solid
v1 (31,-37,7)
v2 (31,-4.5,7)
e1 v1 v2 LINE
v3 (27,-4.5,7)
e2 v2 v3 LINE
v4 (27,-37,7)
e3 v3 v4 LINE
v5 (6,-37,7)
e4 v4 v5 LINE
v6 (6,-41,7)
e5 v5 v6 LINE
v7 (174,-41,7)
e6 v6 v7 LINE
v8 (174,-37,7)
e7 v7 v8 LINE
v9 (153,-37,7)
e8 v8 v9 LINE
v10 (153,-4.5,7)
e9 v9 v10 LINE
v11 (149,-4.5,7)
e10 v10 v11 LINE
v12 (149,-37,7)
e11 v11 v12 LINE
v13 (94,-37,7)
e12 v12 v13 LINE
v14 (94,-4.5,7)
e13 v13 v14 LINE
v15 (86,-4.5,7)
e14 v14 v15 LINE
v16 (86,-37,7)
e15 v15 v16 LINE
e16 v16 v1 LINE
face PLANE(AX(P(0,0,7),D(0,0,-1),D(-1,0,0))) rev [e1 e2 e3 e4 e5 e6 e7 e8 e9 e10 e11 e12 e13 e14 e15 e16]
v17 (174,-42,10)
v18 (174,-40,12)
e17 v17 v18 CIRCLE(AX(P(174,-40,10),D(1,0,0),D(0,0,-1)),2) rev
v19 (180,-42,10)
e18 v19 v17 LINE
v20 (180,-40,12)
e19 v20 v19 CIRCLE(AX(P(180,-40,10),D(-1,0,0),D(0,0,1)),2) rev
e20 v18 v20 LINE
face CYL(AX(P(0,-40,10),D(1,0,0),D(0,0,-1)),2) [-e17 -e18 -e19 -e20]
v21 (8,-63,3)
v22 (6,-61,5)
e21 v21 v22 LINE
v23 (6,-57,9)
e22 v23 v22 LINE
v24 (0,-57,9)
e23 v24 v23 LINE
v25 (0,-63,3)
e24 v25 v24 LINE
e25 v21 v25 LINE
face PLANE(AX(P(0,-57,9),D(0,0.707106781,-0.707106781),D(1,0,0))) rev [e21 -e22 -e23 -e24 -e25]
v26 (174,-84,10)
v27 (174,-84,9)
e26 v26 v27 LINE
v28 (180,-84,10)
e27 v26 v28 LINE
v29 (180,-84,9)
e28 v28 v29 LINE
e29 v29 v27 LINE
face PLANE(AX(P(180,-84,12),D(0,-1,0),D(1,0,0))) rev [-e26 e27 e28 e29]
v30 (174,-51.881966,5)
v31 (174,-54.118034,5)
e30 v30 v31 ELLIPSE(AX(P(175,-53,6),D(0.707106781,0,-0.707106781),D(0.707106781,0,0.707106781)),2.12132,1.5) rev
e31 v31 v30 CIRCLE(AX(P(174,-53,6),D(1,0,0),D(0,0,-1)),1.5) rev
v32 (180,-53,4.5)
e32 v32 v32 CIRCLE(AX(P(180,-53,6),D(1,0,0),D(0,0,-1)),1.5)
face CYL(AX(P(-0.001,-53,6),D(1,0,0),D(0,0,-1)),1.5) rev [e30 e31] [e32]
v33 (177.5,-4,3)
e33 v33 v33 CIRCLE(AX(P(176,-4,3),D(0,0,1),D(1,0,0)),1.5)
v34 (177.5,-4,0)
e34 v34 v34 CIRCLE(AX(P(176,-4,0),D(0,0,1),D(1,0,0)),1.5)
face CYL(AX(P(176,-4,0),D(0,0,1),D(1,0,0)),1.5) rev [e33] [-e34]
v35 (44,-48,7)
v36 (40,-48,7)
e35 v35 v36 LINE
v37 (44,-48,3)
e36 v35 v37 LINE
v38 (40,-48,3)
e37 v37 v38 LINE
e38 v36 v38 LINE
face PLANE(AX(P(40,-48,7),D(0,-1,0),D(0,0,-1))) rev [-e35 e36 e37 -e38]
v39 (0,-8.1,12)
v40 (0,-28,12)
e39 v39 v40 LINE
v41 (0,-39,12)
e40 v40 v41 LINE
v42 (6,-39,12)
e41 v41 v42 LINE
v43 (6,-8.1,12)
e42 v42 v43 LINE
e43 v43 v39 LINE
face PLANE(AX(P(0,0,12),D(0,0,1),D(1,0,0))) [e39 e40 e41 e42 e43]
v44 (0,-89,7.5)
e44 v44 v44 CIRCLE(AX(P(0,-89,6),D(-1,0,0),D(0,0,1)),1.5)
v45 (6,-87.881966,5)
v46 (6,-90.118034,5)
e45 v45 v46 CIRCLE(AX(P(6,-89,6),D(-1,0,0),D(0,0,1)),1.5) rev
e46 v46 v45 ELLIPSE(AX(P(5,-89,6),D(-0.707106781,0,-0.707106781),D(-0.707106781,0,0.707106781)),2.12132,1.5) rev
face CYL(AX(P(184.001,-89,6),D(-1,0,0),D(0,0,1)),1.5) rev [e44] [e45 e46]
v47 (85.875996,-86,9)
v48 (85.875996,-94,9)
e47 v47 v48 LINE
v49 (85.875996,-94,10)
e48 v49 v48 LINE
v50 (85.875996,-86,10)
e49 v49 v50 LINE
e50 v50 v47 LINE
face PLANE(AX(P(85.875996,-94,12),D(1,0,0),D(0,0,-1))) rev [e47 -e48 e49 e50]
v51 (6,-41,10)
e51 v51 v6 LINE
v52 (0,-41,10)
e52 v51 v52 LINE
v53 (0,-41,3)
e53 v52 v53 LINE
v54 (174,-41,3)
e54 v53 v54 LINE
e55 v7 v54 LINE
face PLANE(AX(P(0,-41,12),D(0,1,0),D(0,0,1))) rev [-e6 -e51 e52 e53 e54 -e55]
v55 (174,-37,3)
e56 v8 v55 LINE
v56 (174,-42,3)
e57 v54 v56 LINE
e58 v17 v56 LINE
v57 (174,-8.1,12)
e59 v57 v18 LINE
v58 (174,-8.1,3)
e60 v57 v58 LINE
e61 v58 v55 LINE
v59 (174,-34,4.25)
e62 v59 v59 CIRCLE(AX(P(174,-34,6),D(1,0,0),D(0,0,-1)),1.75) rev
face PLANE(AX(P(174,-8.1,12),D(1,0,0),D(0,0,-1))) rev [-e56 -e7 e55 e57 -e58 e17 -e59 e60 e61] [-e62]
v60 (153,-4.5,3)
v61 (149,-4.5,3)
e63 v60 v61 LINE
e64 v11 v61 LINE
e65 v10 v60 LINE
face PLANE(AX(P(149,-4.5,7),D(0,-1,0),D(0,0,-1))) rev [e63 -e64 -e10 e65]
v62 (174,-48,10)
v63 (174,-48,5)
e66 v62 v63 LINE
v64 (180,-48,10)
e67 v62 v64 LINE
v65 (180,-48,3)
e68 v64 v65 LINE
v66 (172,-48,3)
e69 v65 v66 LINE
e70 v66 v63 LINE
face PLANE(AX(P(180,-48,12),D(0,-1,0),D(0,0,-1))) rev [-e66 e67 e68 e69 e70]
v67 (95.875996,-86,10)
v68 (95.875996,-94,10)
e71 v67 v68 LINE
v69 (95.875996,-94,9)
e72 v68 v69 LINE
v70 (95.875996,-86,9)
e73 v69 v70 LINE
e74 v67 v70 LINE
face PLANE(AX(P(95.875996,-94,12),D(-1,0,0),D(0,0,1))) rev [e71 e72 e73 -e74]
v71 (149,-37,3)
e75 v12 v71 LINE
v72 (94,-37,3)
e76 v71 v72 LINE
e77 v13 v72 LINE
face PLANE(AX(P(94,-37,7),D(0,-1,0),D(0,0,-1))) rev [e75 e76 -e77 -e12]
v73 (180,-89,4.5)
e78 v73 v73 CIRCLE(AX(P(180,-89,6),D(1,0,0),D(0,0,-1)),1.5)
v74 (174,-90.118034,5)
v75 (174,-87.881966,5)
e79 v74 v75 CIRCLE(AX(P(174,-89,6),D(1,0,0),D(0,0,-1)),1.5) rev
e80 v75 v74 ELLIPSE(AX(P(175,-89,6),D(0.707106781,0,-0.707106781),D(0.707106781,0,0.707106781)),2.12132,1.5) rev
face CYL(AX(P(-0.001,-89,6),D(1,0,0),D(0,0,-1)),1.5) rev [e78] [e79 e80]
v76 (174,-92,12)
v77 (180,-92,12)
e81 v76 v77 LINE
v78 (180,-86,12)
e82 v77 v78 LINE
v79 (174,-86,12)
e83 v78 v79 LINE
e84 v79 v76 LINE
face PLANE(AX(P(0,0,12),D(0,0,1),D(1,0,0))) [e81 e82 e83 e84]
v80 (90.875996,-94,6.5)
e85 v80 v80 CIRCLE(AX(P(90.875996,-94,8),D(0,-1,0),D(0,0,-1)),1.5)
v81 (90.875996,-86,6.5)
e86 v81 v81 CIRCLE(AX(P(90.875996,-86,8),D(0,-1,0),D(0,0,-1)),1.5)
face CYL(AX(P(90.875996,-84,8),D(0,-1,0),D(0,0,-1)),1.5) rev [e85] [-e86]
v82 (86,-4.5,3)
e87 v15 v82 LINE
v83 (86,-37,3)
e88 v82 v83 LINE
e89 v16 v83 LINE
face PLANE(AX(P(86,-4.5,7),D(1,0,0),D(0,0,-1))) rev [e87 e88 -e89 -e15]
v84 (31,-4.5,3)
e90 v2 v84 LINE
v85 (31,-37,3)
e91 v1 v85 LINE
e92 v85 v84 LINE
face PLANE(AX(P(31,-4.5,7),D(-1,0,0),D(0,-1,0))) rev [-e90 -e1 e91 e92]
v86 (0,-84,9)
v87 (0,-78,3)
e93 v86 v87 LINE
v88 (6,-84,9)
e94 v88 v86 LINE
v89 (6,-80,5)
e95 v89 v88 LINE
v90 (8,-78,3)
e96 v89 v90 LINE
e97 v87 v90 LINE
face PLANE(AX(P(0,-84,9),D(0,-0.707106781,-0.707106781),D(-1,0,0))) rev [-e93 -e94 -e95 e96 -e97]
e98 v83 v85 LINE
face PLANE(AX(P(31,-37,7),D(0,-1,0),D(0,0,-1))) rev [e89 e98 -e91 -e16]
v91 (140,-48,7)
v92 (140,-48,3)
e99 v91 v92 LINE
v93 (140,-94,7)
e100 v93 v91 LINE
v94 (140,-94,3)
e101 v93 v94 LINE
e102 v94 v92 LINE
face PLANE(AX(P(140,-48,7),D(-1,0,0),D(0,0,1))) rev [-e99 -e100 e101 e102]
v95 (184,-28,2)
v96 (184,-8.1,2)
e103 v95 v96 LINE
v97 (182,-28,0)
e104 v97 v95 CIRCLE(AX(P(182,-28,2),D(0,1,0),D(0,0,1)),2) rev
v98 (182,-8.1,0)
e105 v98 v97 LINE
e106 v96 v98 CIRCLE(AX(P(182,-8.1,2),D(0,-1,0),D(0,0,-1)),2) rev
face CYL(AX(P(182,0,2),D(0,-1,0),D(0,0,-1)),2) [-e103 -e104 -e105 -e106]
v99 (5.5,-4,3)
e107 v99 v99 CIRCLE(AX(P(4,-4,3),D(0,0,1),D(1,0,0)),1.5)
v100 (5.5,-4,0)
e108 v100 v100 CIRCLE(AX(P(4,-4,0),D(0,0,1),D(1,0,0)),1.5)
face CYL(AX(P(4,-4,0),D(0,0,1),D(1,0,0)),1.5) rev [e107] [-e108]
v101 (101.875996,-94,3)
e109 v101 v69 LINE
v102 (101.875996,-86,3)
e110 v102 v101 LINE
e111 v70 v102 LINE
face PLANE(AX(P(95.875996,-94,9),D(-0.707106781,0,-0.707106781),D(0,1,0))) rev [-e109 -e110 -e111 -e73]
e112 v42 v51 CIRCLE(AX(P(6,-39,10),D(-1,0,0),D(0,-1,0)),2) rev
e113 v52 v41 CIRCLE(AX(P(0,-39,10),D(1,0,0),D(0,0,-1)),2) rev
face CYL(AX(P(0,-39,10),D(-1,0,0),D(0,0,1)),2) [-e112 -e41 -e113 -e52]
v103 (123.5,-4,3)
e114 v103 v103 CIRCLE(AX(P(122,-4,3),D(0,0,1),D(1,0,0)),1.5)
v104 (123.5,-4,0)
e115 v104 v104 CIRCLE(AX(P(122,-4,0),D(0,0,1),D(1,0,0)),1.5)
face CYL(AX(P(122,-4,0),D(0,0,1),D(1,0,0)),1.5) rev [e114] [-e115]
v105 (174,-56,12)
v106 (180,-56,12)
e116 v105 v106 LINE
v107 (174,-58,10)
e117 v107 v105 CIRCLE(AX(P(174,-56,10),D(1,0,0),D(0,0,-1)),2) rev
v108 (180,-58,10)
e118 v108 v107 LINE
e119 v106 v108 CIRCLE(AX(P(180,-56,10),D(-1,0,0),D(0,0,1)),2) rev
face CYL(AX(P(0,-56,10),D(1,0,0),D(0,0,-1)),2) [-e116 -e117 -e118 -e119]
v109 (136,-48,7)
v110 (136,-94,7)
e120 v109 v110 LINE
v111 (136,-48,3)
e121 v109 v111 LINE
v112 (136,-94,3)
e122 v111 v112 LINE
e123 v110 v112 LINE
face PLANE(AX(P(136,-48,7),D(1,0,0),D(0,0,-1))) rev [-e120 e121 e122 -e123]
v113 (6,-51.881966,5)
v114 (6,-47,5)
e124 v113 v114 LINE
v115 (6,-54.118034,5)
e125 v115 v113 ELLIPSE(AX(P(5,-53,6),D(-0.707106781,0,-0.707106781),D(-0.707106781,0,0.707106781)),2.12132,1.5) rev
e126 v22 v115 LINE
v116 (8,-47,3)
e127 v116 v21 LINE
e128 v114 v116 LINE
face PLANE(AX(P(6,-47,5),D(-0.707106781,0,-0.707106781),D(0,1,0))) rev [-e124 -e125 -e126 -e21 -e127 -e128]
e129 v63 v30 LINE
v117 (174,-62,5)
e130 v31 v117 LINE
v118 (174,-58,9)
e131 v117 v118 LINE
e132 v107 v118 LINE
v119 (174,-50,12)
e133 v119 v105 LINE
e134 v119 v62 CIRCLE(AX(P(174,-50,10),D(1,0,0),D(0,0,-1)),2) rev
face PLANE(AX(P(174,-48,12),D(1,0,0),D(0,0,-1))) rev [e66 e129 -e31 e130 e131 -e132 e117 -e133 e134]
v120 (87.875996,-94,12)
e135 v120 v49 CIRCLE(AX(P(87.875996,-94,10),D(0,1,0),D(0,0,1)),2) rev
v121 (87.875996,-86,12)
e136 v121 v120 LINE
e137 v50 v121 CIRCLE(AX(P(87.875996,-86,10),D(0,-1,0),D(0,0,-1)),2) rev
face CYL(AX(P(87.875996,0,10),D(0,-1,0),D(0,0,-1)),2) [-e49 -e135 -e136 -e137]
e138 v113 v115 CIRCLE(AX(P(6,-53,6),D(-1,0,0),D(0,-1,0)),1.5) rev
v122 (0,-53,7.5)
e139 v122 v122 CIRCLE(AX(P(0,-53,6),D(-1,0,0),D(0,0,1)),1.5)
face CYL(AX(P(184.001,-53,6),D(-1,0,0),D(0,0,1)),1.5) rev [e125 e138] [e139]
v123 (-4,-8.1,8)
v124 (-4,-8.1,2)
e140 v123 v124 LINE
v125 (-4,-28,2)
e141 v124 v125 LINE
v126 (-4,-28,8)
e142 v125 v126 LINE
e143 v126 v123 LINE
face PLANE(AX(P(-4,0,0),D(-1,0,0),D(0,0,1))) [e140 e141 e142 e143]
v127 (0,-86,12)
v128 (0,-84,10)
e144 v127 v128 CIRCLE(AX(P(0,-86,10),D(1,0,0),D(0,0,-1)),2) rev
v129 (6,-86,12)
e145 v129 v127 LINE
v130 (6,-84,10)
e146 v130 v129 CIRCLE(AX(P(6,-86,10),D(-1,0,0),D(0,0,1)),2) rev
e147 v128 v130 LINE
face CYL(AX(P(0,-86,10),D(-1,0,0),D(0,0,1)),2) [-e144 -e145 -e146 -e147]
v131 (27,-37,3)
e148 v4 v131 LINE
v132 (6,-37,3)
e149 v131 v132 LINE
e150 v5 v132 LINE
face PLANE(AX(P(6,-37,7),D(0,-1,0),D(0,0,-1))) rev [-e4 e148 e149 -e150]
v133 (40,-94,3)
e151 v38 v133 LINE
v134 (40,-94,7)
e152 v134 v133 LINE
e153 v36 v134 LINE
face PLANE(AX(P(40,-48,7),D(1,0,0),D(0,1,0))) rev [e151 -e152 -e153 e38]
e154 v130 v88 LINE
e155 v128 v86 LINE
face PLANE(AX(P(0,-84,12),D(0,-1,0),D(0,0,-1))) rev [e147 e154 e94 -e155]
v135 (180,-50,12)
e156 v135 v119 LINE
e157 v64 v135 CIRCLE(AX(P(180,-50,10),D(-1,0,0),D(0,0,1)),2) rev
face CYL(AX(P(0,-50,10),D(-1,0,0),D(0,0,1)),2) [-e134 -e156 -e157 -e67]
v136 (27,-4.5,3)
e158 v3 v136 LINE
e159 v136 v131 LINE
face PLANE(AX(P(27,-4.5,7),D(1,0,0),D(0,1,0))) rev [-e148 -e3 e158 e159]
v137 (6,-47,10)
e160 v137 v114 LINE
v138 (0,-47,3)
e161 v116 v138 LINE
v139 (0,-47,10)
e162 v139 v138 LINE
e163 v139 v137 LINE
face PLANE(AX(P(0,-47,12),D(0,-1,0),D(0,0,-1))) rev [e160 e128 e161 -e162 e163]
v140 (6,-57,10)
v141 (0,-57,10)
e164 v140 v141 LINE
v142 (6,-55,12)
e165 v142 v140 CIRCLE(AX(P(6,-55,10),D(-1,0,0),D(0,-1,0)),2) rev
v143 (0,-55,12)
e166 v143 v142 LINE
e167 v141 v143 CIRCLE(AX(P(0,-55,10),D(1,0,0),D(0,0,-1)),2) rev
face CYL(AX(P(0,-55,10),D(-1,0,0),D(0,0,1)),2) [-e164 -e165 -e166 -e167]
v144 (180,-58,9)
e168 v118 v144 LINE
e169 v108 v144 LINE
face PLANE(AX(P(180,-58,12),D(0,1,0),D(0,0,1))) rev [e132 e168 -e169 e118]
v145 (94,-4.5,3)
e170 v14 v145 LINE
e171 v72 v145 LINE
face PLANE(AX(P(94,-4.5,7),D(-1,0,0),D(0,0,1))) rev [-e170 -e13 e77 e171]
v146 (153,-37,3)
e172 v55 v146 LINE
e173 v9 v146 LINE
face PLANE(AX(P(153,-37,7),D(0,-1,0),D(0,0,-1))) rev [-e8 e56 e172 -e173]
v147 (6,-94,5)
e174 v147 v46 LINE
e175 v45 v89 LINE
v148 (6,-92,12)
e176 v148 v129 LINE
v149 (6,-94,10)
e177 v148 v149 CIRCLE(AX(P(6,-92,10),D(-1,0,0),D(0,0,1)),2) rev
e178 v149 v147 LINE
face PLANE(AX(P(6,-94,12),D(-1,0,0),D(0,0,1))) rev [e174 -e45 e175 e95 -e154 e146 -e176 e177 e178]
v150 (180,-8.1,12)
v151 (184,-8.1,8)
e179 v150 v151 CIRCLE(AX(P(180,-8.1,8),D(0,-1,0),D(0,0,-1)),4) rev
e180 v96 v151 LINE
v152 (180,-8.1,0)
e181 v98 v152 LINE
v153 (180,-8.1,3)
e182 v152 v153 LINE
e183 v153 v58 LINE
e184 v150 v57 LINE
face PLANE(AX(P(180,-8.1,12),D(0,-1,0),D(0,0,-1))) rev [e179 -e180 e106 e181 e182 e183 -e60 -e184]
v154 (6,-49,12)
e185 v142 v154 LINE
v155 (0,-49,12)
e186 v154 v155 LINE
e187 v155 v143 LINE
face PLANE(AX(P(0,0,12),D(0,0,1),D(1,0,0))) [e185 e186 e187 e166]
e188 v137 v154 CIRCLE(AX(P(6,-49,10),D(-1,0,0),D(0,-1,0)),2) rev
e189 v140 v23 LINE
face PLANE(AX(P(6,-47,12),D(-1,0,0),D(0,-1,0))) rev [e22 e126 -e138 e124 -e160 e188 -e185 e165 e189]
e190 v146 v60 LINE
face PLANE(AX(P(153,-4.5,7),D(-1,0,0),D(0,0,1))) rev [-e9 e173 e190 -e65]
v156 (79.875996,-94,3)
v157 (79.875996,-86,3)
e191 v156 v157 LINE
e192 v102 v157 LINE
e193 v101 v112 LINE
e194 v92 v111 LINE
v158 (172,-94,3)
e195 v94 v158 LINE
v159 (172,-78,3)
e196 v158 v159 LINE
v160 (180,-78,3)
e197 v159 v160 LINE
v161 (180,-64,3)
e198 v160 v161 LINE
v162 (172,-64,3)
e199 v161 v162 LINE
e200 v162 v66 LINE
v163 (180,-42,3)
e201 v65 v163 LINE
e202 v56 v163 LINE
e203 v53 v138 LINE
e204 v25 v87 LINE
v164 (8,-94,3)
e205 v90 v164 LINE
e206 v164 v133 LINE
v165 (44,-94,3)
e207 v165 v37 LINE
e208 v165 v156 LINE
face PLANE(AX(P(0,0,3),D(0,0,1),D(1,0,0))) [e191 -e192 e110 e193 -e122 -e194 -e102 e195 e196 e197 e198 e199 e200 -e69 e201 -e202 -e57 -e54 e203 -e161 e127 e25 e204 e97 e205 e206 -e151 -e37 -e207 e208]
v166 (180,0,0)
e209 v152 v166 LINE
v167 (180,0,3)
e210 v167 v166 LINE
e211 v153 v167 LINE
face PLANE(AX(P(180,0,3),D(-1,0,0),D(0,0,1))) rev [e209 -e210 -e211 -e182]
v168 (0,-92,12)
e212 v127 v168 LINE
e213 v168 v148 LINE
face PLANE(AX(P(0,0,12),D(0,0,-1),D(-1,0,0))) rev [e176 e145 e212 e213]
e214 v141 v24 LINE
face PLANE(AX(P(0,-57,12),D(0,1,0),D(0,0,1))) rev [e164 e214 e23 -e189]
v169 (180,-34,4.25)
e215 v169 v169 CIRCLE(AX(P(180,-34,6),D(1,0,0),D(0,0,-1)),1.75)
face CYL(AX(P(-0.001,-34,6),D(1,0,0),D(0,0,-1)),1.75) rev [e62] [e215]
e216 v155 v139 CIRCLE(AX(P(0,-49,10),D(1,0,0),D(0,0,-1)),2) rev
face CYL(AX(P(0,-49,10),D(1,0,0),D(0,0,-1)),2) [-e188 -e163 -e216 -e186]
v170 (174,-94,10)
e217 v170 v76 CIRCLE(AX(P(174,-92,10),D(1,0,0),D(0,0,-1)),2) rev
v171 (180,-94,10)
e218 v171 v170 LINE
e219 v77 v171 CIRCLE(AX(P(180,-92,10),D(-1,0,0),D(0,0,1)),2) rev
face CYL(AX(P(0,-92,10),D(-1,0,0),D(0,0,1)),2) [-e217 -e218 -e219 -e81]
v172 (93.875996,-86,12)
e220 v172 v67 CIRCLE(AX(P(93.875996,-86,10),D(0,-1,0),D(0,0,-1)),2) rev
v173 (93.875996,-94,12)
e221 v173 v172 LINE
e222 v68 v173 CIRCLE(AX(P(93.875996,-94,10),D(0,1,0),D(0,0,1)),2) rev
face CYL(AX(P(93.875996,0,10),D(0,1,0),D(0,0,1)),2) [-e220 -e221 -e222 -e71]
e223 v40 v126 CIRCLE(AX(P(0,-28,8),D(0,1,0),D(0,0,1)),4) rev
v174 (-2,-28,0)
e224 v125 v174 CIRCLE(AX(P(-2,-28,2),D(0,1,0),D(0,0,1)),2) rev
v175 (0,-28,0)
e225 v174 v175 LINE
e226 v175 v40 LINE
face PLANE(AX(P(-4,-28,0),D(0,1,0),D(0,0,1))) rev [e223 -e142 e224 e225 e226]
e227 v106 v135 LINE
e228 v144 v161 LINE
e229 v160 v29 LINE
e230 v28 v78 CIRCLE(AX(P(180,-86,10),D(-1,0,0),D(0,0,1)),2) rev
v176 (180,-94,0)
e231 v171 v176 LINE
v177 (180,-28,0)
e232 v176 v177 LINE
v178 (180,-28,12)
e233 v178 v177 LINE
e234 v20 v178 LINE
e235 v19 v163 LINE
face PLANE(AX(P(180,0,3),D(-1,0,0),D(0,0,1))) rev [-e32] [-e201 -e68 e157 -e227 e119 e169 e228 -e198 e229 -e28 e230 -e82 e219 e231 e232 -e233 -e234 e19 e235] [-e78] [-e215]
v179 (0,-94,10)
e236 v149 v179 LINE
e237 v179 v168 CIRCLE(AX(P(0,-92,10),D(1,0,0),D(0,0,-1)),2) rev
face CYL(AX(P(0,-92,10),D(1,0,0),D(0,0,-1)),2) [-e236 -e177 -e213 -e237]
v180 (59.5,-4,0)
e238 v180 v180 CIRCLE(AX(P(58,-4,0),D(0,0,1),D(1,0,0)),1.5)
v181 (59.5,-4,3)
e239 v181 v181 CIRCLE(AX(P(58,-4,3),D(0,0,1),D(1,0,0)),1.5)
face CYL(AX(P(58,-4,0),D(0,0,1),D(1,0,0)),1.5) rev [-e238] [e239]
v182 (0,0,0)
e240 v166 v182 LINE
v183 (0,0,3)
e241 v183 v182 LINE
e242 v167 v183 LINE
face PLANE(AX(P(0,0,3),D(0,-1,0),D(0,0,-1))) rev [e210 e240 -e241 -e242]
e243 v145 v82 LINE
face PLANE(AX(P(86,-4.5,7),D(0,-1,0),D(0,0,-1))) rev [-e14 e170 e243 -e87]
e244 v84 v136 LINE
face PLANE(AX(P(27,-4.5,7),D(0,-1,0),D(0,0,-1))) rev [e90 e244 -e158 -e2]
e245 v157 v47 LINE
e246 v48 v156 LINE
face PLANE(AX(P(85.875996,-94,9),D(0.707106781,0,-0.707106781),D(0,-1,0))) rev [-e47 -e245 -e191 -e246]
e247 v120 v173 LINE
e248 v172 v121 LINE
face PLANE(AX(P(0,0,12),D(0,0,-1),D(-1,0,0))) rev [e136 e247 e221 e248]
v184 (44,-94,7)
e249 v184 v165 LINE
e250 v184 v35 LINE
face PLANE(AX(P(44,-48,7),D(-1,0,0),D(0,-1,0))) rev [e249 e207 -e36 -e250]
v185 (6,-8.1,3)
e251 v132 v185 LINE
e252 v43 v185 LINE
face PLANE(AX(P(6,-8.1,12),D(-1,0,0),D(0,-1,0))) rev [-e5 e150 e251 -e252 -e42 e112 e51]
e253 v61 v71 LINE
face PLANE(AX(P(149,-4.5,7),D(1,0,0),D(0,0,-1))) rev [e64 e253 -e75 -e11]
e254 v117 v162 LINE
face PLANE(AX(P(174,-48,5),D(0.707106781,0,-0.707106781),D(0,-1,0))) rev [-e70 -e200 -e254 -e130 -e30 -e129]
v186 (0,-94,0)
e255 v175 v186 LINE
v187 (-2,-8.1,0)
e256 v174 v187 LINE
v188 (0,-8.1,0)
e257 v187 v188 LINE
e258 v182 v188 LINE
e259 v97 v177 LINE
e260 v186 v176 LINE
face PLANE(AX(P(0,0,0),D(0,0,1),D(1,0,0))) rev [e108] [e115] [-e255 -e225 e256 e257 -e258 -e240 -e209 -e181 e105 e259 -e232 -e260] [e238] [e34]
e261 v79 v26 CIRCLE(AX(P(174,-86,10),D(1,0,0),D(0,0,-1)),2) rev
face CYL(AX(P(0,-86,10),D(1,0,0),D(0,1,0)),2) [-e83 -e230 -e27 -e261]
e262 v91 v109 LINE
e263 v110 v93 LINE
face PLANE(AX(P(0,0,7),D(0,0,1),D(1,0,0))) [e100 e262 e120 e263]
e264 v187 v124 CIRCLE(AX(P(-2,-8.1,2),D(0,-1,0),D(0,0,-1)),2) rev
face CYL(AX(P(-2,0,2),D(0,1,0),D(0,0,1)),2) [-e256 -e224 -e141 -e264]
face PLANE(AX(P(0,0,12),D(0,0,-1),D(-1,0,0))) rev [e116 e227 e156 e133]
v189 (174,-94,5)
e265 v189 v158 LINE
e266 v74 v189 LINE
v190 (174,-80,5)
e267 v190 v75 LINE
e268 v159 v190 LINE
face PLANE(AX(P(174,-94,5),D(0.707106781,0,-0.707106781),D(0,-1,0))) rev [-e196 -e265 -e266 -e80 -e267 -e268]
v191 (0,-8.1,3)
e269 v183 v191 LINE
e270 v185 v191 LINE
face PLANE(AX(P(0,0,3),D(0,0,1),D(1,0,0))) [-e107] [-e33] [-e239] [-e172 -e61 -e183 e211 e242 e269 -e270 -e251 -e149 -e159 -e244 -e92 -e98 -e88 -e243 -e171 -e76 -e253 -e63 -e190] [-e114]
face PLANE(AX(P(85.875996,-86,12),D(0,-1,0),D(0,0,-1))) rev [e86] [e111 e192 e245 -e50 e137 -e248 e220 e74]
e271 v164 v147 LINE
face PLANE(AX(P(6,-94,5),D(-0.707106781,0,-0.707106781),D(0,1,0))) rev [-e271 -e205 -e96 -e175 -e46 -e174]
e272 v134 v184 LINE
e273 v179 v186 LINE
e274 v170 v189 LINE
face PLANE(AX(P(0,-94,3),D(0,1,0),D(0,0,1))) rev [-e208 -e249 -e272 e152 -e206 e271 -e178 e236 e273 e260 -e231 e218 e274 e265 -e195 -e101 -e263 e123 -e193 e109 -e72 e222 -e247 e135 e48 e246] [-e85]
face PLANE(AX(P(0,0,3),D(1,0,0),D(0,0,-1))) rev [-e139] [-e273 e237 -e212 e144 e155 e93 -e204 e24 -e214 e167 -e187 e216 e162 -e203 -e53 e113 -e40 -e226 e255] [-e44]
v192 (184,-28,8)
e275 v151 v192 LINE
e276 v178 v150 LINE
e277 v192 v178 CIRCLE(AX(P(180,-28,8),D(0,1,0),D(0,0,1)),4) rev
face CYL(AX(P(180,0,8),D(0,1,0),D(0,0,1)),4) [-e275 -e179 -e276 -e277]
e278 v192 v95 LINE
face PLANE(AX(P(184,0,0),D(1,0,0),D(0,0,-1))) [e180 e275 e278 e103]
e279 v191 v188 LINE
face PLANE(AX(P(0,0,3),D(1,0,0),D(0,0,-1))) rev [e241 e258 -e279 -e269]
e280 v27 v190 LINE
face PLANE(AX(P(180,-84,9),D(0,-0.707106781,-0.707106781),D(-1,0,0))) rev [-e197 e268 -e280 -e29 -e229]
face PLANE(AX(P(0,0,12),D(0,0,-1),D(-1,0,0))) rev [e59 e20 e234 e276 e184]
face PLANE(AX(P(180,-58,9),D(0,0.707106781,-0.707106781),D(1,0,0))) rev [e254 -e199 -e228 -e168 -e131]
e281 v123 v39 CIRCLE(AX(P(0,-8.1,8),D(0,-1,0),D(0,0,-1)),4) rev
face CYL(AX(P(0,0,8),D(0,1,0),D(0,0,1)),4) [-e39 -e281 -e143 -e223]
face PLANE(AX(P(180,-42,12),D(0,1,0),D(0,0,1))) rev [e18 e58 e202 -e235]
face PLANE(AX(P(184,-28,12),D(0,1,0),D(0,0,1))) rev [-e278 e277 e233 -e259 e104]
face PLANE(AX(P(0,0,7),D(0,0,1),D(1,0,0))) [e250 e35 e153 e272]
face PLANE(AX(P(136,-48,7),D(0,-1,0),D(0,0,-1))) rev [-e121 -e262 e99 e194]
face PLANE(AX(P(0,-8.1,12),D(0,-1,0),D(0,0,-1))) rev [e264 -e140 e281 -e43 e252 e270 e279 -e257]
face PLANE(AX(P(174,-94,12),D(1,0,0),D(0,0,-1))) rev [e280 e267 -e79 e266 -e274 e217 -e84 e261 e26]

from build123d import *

# Parameters (mm, degrees)
SKETCH_1_W          = 180
SKETCH_1_H          = 94
EXTRUDE_1_DEPTH     = 3
SKETCH_2_W          = 6
SKETCH_2_H          = 10
SKETCH_2_H_2        = 33.9
SKETCH_2_H_3        = 32.9
SKETCH_2_W_2        = 10
SKETCH_2_H_4        = 8
EXTRUDE_2_DEPTH     = 9
CHAMFER_2_SIZE      = 6
CHAMFER_1_SIZE      = 6
CUT_EXTRUDE_1_REACH = 205.421
SKETCH_3_R          = 1.5
SKETCH_3_R_2        = 1.75
SKETCH_4_R          = 1.5
CUT_EXTRUDE_2_DEPTH = 204.265835791
SKETCH_5_W          = 4
SKETCH_5_H          = 46
EXTRUDE_3_DEPTH     = 4
CHAMFER_3_SIZE      = 2
SKETCH_6_W          = 12
SKETCH_6_H          = 19.9
EXTRUDE_4_DEPTH     = 4
FILLET_1_R          = 4
SKETCH_7_W          = 12
SKETCH_7_H          = 19.9
EXTRUDE_5_DEPTH     = 4
FILLET_2_R          = 4
FILLET_3_R          = 2
SKETCH_8_R          = 1.5
CUT_EXTRUDE_3_DEPTH = 10
CUT_EXTRUDE_4_REACH = 208.969
SKETCH_9_R          = 1.5
CHAMFER_4_SIZE      = 6
FILLET_4_R          = 2


with BuildPart() as part:
    # Эскиз1 → Бобышка-Вытянуть1 (new body)
    with BuildSketch(Plane.XY):
        with Locations((90, -47)):
            Rectangle(SKETCH_1_W, SKETCH_1_H)
    extrude(amount=EXTRUDE_1_DEPTH)

    # Эскиз2 → Бобышка-Вытянуть2 (add)
    with BuildSketch(Plane.XY.offset(3)):
        with Locations((3, -89)):
            Rectangle(SKETCH_2_W, SKETCH_2_H)
        with Locations((177, -89)):
            Rectangle(SKETCH_2_W, SKETCH_2_H)
        with Locations((3, -52)):
            Rectangle(SKETCH_2_W, SKETCH_2_H)
        with Locations((177, -53)):
            Rectangle(SKETCH_2_W, SKETCH_2_H)
        with Locations((177, -25.05)):
            Rectangle(SKETCH_2_W, SKETCH_2_H_2)
        with Locations((3, -24.55)):
            Rectangle(SKETCH_2_W, SKETCH_2_H_3)
        with Locations((90.875995779, -90)):
            Rectangle(SKETCH_2_W_2, SKETCH_2_H_4)
    extrude(amount=EXTRUDE_2_DEPTH)

    # Фаска2
    chamfer_2_edges = [part.edges().sort_by_distance(p)[0] for p in [
        (3, -57, 3),
        (177, -58, 3),
    ]]
    chamfer(chamfer_2_edges, length=CHAMFER_2_SIZE)

    # Фаска1
    chamfer_1_edges = [part.edges().sort_by_distance(p)[0] for p in [
        (3, -84, 3),
        (177, -84, 3),
    ]]
    chamfer(chamfer_1_edges, length=CHAMFER_1_SIZE)

    # Эскиз3 → Вырез-Вытянуть1 (cut, up to next)
    with BuildSketch(Plane(origin=(180, 0, 0), x_dir=(0, 0, -1), z_dir=(1, 0, 0)), mode=Mode.PRIVATE) as cut_extrude_1_sk1:
        with Locations((-6, -89)):
            Circle(SKETCH_3_R)
    cut_extrude_1_tool1 = extrude(cut_extrude_1_sk1.sketch, amount=-CUT_EXTRUDE_1_REACH, mode=Mode.PRIVATE) & part.part
    # Эскиз3 → Вырез-Вытянуть1 (cut, up to next)
    with BuildSketch(Plane(origin=(180, 0, 0), x_dir=(0, 0, -1), z_dir=(1, 0, 0)), mode=Mode.PRIVATE) as cut_extrude_1_sk2:
        with Locations((-6, -53)):
            Circle(SKETCH_3_R)
    cut_extrude_1_tool2 = extrude(cut_extrude_1_sk2.sketch, amount=-CUT_EXTRUDE_1_REACH, mode=Mode.PRIVATE) & part.part
    # Эскиз3 → Вырез-Вытянуть1 (cut, up to next)
    with BuildSketch(Plane(origin=(180, 0, 0), x_dir=(0, 0, -1), z_dir=(1, 0, 0)), mode=Mode.PRIVATE) as cut_extrude_1_sk3:
        with Locations((-6, -34)):
            Circle(SKETCH_3_R_2)
    cut_extrude_1_tool3 = extrude(cut_extrude_1_sk3.sketch, amount=-CUT_EXTRUDE_1_REACH, mode=Mode.PRIVATE) & part.part
    add(cut_extrude_1_tool1.solids().sort_by_distance((180, -89, 6))[0], mode=Mode.SUBTRACT)
    add(cut_extrude_1_tool2.solids().sort_by_distance((180, -53, 6))[0], mode=Mode.SUBTRACT)
    add(cut_extrude_1_tool3.solids().sort_by_distance((180, -34, 6))[0], mode=Mode.SUBTRACT)

    # Эскиз4 → Вырез-Вытянуть2 (cut, through all)
    with BuildSketch(Plane.XY.offset(3)):
        with Locations((4, -4)):
            Circle(SKETCH_4_R)
        with Locations((176, -4)):
            Circle(SKETCH_4_R)
        with Locations((58, -4)):
            Circle(SKETCH_4_R)
        with Locations((122, -4)):
            Circle(SKETCH_4_R)
    extrude(amount=-CUT_EXTRUDE_2_DEPTH, mode=Mode.SUBTRACT)

    # Эскиз5 → Бобышка-Вытянуть3 (add)
    with BuildSketch(Plane.XY.offset(3)):
        with Locations((42, -71)):
            Rectangle(SKETCH_5_W, SKETCH_5_H)
        with Locations((138, -71)):
            Rectangle(SKETCH_5_W, SKETCH_5_H)
        Polygon((27, -4.5), (27, -37), (6, -37), (6, -41), (174, -41), (174, -37), (153, -37), (153, -4.5), (149, -4.5), (149, -37), (94, -37), (94, -4.5), (86, -4.5), (86, -37), (31, -37), (31, -4.5), align=None)
    extrude(amount=EXTRUDE_3_DEPTH)

    # Фаска3
    # the kernel refuses this chamfer: 2 mm, written as the material it adds along each edge
    with BuildSketch(Plane(origin=(6, -72.856634024, 3), x_dir=(0.9996219169112968, 0, -0.02749587661058627), z_dir=(0, -1, 0))) as chamfer_3_piece_1_section:
        Polygon((CHAMFER_3_SIZE * 0.999621916911, CHAMFER_3_SIZE * 0.0274958766106), (-CHAMFER_3_SIZE * 0.0274958766106, CHAMFER_3_SIZE * 0.999621916911), (0, 0), align=None)
    chamfer_3_piece_1 = extrude(amount=21.143365976, mode=Mode.PRIVATE)
    chamfer_3_piece_1 = split(chamfer_3_piece_1, bisect_by=Plane(origin=(6.668439358, -82.482271763, 7.482271763), z_dir=(0, -0.7071067811865476, -0.7071067811865476)), keep=Keep.TOP, mode=Mode.PRIVATE)
    add(chamfer_3_piece_1)
    with BuildSketch(Plane(origin=(174, -94, 3), x_dir=(-0.9996219169112968, 0, -0.02749587661058639), z_dir=(0, 1, 0))) as chamfer_3_piece_2_section:
        Polygon((CHAMFER_3_SIZE * 0.999621916911, CHAMFER_3_SIZE * 0.0274958766106), (-CHAMFER_3_SIZE * 0.0274958766106, CHAMFER_3_SIZE * 0.999621916911), (0, 0), align=None)
    chamfer_3_piece_2 = extrude(amount=21.143365976, mode=Mode.PRIVATE)
    chamfer_3_piece_2 = split(chamfer_3_piece_2, bisect_by=Plane(origin=(173.327651835, -82.469530213, 7.469530213), z_dir=(2.038461385028344e-15, -0.7071067811865476, -0.7071067811865476)), keep=Keep.TOP, mode=Mode.PRIVATE)
    chamfer_3_piece_2 = chamfer_3_piece_2 - Plane(origin=(173.327651835, -89, 6), x_dir=(0, 0, -1), z_dir=(1, 0, 0)) * Cylinder(1.5, 51, mode=Mode.PRIVATE)
    add(chamfer_3_piece_2)
    with BuildSketch(Plane(origin=(6, -47, 3), x_dir=(0.9996219169112968, 0, -0.02749587661058627), z_dir=(0, -1, 0))) as chamfer_3_piece_3_section:
        Polygon((CHAMFER_3_SIZE * 0.999621916911, CHAMFER_3_SIZE * 0.0274958766106), (-CHAMFER_3_SIZE * 0.0274958766106, CHAMFER_3_SIZE * 0.999621916911), (0, 0), align=None)
    chamfer_3_piece_3 = extrude(amount=21.143365976, mode=Mode.PRIVATE)
    chamfer_3_piece_3 = split(chamfer_3_piece_3, bisect_by=Plane(origin=(6.668439358, -58.517728237, 7.482271763), z_dir=(0, 0.7071067811865476, -0.7071067811865476)), keep=Keep.TOP, mode=Mode.PRIVATE)
    add(chamfer_3_piece_3)
    with BuildSketch(Plane(origin=(174, -69.143365976, 3), x_dir=(-0.9996219169112968, 0, -0.02749587661058639), z_dir=(0, 1, 0))) as chamfer_3_piece_4_section:
        Polygon((CHAMFER_3_SIZE * 0.999621916911, CHAMFER_3_SIZE * 0.0274958766106), (-CHAMFER_3_SIZE * 0.0274958766106, CHAMFER_3_SIZE * 0.999621916911), (0, 0), align=None)
    chamfer_3_piece_4 = extrude(amount=21.143365976, mode=Mode.PRIVATE)
    chamfer_3_piece_4 = split(chamfer_3_piece_4, bisect_by=Plane(origin=(173.327651834, -59.530469789, 7.469530211), z_dir=(0, 0.7071067811865476, -0.7071067811865476)), keep=Keep.TOP, mode=Mode.PRIVATE)
    chamfer_3_piece_4 = chamfer_3_piece_4 - Plane(origin=(173.327651834, -53, 6), x_dir=(0, 0, -1), z_dir=(1, 0, 0)) * Cylinder(1.5, 51, mode=Mode.PRIVATE)
    add(chamfer_3_piece_4)

    # Эскиз6 → Бобышка-Вытянуть4 (add)
    with BuildSketch(Plane(origin=(180, 0, 0), x_dir=(0, 0, -1), z_dir=(1, 0, 0))):
        with Locations((-6, -18.05)):
            Rectangle(SKETCH_6_W, SKETCH_6_H)
    extrude(amount=EXTRUDE_4_DEPTH)

    # Скругление1
    fillet_1_edges = [part.edges().sort_by_distance(p)[0] for p in [
        (184, -18.05, 12),
    ]]
    fillet(fillet_1_edges, radius=FILLET_1_R)

    # Эскиз7 → Бобышка-Вытянуть5 (add)
    with BuildSketch(Plane.ZY):
        with Locations((6, -18.05)):
            Rectangle(SKETCH_7_W, SKETCH_7_H)
    extrude(amount=EXTRUDE_5_DEPTH)

    # Скругление2
    fillet_2_edges = [part.edges().sort_by_distance(p)[0] for p in [
        (-4, -18.05, 12),
    ]]
    fillet(fillet_2_edges, radius=FILLET_2_R)

    # Скругление3
    fillet_3_edges = [part.edges().sort_by_distance(p)[0] for p in [
        (184, -18.05, 0),
        (-4, -18.05, 0),
    ]]
    fillet(fillet_3_edges, radius=FILLET_3_R)

    # Эскиз8 → Вырез-Вытянуть3 (cut)
    with BuildSketch(Plane.XZ.offset(94)):
        with Locations(Location((90.875995779, 8, 0), (0, 0, 270))):
            Circle(SKETCH_8_R)
    extrude(amount=-CUT_EXTRUDE_3_DEPTH, mode=Mode.SUBTRACT)

    # Эскиз9 → Вырез-Вытянуть4 (cut, up to next)
    with BuildSketch(Plane.ZY, mode=Mode.PRIVATE) as cut_extrude_4_sk1:
        with Locations(Location((6, -89, 0), (0, 0, 180))):
            Circle(SKETCH_9_R)
    cut_extrude_4_tool1 = extrude(cut_extrude_4_sk1.sketch, amount=-CUT_EXTRUDE_4_REACH, mode=Mode.PRIVATE) & part.part
    # Эскиз9 → Вырез-Вытянуть4 (cut, up to next)
    with BuildSketch(Plane.ZY, mode=Mode.PRIVATE) as cut_extrude_4_sk2:
        with Locations(Location((6, -53, 0), (0, 0, 180))):
            Circle(SKETCH_9_R)
    cut_extrude_4_tool2 = extrude(cut_extrude_4_sk2.sketch, amount=-CUT_EXTRUDE_4_REACH, mode=Mode.PRIVATE) & part.part
    add(cut_extrude_4_tool1.solids().sort_by_distance((0, -89, 6))[0], mode=Mode.SUBTRACT)
    add(cut_extrude_4_tool2.solids().sort_by_distance((0, -53, 6))[0], mode=Mode.SUBTRACT)

    # Фаска4
    chamfer_4_edges = [part.edges().sort_by_distance(p)[0] for p in [
        (85.875995779, -90, 3),
        (95.875995779, -90, 3),
    ]]
    chamfer(chamfer_4_edges, length=CHAMFER_4_SIZE)

    # Скругление4
    fillet_4_edges = [part.edges().sort_by_distance(p)[0] for p in [
        (177, -84, 12),
        (3, -84, 12),
        (3, -41, 12),
        (3, -47, 12),
        (3, -57, 12),
        (3, -94, 12),
        (177, -42, 12),
        (177, -48, 12),
        (177, -58, 12),
        (85.875995779, -90, 12),
        (95.875995779, -90, 12),
        (177, -94, 12),
    ]]
    fillet(fillet_4_edges, radius=FILLET_4_R)


solid = part.part
